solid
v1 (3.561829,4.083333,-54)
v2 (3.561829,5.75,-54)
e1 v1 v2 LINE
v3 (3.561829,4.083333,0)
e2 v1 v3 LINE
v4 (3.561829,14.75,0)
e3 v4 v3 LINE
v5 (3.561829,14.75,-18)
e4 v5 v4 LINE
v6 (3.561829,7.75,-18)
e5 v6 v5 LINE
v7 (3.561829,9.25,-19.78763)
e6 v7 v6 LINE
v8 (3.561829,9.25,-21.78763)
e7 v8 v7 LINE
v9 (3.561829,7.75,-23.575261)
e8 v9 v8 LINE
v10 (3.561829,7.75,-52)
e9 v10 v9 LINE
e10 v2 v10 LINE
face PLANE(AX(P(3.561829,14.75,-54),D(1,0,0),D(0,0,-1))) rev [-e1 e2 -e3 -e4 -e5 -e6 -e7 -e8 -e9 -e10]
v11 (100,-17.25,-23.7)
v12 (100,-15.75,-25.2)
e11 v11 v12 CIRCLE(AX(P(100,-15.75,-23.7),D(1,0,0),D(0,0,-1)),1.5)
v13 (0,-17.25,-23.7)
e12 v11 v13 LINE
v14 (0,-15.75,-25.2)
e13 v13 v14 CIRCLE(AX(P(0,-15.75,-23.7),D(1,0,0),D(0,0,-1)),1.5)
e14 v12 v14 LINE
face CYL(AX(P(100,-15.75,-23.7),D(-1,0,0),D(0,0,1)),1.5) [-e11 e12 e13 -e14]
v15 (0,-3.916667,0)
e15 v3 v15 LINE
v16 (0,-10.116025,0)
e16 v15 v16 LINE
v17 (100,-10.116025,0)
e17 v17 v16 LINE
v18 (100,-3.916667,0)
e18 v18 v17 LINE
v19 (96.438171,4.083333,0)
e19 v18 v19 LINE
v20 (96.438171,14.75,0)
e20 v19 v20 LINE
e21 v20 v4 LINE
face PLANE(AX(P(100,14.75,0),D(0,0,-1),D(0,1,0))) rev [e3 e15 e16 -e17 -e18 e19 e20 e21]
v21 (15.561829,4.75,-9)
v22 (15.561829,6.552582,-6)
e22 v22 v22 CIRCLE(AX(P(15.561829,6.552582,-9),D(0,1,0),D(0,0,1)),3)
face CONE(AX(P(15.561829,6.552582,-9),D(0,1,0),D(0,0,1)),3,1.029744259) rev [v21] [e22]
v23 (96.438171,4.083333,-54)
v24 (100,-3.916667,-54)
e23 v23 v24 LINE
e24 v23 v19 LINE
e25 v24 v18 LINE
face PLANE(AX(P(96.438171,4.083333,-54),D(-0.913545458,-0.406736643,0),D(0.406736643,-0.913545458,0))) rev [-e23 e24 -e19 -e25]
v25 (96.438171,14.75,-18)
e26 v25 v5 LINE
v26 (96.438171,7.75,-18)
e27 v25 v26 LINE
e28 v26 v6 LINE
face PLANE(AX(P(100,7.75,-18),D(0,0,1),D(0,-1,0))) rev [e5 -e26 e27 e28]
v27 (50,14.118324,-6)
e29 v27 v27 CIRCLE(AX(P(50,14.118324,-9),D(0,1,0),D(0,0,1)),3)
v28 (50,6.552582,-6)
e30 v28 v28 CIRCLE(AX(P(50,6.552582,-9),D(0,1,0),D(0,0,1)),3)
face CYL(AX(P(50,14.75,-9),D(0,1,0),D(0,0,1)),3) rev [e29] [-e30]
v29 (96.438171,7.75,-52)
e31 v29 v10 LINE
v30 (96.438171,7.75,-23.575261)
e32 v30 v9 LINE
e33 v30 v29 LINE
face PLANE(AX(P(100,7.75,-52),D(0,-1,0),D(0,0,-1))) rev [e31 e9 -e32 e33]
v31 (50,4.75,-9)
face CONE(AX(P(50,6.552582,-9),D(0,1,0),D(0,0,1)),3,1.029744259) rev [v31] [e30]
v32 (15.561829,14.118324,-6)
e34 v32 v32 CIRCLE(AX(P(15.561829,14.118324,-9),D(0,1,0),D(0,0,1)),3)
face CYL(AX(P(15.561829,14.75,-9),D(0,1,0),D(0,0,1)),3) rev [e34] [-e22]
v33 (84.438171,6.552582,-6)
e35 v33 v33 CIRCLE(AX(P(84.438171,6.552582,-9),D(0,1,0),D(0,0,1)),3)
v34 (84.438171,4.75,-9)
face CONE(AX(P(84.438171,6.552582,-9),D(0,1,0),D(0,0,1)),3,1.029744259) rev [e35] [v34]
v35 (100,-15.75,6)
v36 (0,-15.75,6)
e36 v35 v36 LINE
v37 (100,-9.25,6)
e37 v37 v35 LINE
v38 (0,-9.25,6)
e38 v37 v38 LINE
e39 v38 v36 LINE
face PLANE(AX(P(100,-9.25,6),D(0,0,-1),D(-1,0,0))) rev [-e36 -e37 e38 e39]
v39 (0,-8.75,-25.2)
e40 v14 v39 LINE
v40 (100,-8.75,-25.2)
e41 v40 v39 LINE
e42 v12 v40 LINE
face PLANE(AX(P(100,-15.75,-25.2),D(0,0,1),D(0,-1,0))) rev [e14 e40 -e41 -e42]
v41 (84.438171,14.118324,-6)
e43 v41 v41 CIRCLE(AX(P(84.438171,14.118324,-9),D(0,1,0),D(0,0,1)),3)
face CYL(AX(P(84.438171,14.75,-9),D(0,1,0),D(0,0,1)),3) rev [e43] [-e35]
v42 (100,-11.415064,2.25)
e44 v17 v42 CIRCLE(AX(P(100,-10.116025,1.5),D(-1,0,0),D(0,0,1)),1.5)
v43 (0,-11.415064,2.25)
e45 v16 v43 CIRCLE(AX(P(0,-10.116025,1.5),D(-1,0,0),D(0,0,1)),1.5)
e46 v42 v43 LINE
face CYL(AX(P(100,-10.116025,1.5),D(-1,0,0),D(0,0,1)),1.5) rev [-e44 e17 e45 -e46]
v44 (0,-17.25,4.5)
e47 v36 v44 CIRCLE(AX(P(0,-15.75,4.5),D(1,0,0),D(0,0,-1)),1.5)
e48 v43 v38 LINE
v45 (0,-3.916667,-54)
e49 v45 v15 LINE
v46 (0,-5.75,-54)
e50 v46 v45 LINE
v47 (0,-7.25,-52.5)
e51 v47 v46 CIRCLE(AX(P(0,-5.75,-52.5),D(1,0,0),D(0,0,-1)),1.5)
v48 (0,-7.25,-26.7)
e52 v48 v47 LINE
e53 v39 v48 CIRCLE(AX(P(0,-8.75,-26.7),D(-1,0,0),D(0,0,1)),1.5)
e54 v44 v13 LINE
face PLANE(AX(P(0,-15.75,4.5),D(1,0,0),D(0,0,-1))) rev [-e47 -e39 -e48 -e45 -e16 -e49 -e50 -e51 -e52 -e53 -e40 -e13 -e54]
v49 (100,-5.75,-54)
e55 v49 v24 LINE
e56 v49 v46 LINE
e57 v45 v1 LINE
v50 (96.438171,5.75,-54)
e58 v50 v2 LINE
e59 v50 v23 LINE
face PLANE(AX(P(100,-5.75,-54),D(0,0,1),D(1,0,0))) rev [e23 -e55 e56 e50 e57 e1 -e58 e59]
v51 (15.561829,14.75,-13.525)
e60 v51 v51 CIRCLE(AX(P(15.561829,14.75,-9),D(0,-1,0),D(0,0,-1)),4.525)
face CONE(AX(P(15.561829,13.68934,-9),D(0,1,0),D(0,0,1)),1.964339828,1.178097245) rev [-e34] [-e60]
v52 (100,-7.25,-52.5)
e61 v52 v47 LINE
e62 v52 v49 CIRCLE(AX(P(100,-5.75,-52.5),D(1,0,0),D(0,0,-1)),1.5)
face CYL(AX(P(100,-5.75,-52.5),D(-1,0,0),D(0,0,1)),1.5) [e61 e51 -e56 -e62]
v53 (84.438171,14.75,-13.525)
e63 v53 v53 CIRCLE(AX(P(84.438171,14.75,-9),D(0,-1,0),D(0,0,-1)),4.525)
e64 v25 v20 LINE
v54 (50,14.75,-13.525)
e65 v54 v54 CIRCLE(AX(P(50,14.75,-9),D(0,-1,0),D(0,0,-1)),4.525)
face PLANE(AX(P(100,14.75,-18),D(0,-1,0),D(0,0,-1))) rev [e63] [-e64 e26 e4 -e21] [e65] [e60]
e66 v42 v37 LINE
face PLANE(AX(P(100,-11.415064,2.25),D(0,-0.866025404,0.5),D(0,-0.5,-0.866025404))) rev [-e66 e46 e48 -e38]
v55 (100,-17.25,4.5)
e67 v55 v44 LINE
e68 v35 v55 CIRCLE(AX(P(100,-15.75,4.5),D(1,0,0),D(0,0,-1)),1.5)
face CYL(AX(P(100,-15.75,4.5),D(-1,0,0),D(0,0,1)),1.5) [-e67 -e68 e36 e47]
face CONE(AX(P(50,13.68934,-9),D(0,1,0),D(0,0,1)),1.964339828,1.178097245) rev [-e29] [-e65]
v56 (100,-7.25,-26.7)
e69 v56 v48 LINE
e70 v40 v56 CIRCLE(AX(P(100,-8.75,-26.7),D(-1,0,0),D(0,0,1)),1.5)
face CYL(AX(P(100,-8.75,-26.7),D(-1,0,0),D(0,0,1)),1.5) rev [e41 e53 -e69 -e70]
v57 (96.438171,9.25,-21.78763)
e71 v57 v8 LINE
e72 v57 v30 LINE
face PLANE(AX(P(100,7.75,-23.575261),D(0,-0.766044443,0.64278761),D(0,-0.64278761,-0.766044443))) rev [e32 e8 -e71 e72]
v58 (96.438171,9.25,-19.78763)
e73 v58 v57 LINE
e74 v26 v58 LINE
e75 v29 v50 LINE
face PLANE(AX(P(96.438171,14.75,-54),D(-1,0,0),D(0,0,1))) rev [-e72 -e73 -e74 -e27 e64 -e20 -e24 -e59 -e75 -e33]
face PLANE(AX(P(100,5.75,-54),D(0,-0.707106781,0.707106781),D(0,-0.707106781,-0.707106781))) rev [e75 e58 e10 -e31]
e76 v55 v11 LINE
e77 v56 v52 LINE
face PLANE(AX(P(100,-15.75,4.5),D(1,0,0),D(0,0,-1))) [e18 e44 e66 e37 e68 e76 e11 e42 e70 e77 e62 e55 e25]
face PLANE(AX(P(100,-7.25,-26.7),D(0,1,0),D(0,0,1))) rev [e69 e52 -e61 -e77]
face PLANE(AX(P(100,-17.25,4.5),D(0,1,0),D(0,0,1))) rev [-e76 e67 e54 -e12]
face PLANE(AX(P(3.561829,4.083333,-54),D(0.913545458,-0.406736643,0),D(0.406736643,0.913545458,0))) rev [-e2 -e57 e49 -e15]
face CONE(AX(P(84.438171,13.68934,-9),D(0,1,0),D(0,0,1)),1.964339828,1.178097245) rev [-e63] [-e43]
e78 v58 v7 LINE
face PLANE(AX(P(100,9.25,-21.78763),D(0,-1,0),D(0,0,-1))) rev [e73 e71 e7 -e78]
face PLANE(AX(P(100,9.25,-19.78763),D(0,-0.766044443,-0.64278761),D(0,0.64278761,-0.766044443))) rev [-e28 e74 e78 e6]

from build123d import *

# Parameters (mm, degrees)
BOSS_EXTRUDE1_DEPTH             = 100
CUT_EXTRUDE1_DEPTH              = 115.950260983
CUT_EXTRUDE1_DEPTH_BACK         = 115.950260983
F_6_0MM_DOWEL_HOLE1_D           = 6
F_6_0MM_DOWEL_HOLE1_DEPTH       = 8.197418143
F_6_0MM_DOWEL_HOLE1_CSINK_D     = 6.05
F_6_0MM_DOWEL_HOLE1_CSINK_ANGLE = 90
F_6_0MM_DOWEL_HOLE1_TIP         = 1.802581857
CHAMFER1_SIZE                   = 1.5


with BuildPart() as part:
    # Sketch1 → Boss-Extrude1 (new body)
    with BuildSketch(Plane(origin=(0, 0, 0), x_dir=(0, 0, -1), z_dir=(1, 0, 0))):
        with BuildLine():
            Line((-6, -9.25), (-6, -15.75))
            ThreePointArc((-6, -15.75), (-5.560660172, -16.810660172), (-4.5, -17.25))
            Line((-4.5, -17.25), (23.7, -17.25))
            ThreePointArc((23.7, -17.25), (24.760660172, -16.810660172), (25.2, -15.75))
            Line((25.2, -15.75), (25.2, -8.75))
            ThreePointArc((25.2, -8.75), (25.639339828, -7.689339828), (26.7, -7.25))
            Line((26.7, -7.25), (52.5, -7.25))
            ThreePointArc((52.5, -7.25), (53.560660172, -6.810660172), (54, -5.75))
            Line((54, -5.75), (54, 5.75))
            Line((54, 5.75), (52, 7.75))
            Line((52, 7.75), (23.575260778, 7.75))
            Line((23.575260778, 7.75), (21.787630389, 9.25))
            Line((21.787630389, 9.25), (19.787630389, 9.25))
            Line((19.787630389, 9.25), (18, 7.75))
            Line((18, 7.75), (18, 14.75))
            Line((18, 14.75), (0, 14.75))
            Line((0, 14.75), (0, -10.116025404))
            ThreePointArc((0, -10.116025404), (-0.75, -11.415063509), (-2.25, -11.415063509))
            Line((-2.25, -11.415063509), (-6, -9.25))
        make_face()
    extrude(amount=BOSS_EXTRUDE1_DEPTH)

    # Sketch2 → Cut-Extrude1 (cut, two sides: drawn at the far end of the back side and taken through both)
    with BuildSketch(Plane.XY.offset(-CUT_EXTRUDE1_DEPTH_BACK)):
        Polygon((96.438170518, 14.75), (96.438170518, 4.083333333), (100, -3.916666667), (100, 14.75), align=None)
        Polygon((0, 14.75), (3.561829482, 14.75), (3.561829482, 4.083333333), (0, -3.916666667), align=None)
    extrude(amount=CUT_EXTRUDE1_DEPTH + CUT_EXTRUDE1_DEPTH_BACK, mode=Mode.SUBTRACT)

    # Ø6.0mm Dowel Hole1
    with Locations(Plane(origin=(0, 14.75, 0), x_dir=(1, 0, 0), z_dir=(0, 1, 0))):
        with Locations((15.561829482, 9), (50, 9), (84.438170518, 9)):
            CounterSinkHole(F_6_0MM_DOWEL_HOLE1_D / 2, F_6_0MM_DOWEL_HOLE1_CSINK_D / 2, depth=F_6_0MM_DOWEL_HOLE1_DEPTH, counter_sink_angle=F_6_0MM_DOWEL_HOLE1_CSINK_ANGLE)
            with Locations((0, 0, -(F_6_0MM_DOWEL_HOLE1_DEPTH + F_6_0MM_DOWEL_HOLE1_TIP / 2))):  # 118° drill point
                Cone(0, F_6_0MM_DOWEL_HOLE1_D / 2, F_6_0MM_DOWEL_HOLE1_TIP, mode=Mode.SUBTRACT)

    # Chamfer1
    # the kernel refuses this chamfer: 1.5 mm, written as the material it takes off along each edge
    with BuildSketch(Plane(origin=(84.438170518, 14.75, -9), x_dir=(-1, 0, 0), z_dir=(0, 0, 1))) as chamfer1_piece_1:
        Polygon((3.025 + CHAMFER1_SIZE, 0), (3.025 - CHAMFER1_SIZE * 0.707106781187, CHAMFER1_SIZE * 0.707106781187), (3.025, 0), align=None)
    revolve(axis=Axis((84.438170518, 14.75, -9), (0, -1, 0)), mode=Mode.SUBTRACT)
    with BuildSketch(Plane(origin=(50, 14.75, -9), x_dir=(-1, 0, 0), z_dir=(0, 0, 1))) as chamfer1_piece_2:
        Polygon((3.025 + CHAMFER1_SIZE, 0), (3.025 - CHAMFER1_SIZE * 0.707106781187, CHAMFER1_SIZE * 0.707106781187), (3.025, 0), align=None)
    revolve(axis=Axis((50, 14.75, -9), (0, -1, 0)), mode=Mode.SUBTRACT)
    with BuildSketch(Plane(origin=(15.561829482, 14.75, -9), x_dir=(-1, 0, 0), z_dir=(0, 0, 1))) as chamfer1_piece_3:
        Polygon((3.025 + CHAMFER1_SIZE, 0), (3.025 - CHAMFER1_SIZE * 0.707106781187, CHAMFER1_SIZE * 0.707106781187), (3.025, 0), align=None)
    revolve(axis=Axis((15.561829482, 14.75, -9), (0, -1, 0)), mode=Mode.SUBTRACT)


solid = part.part
